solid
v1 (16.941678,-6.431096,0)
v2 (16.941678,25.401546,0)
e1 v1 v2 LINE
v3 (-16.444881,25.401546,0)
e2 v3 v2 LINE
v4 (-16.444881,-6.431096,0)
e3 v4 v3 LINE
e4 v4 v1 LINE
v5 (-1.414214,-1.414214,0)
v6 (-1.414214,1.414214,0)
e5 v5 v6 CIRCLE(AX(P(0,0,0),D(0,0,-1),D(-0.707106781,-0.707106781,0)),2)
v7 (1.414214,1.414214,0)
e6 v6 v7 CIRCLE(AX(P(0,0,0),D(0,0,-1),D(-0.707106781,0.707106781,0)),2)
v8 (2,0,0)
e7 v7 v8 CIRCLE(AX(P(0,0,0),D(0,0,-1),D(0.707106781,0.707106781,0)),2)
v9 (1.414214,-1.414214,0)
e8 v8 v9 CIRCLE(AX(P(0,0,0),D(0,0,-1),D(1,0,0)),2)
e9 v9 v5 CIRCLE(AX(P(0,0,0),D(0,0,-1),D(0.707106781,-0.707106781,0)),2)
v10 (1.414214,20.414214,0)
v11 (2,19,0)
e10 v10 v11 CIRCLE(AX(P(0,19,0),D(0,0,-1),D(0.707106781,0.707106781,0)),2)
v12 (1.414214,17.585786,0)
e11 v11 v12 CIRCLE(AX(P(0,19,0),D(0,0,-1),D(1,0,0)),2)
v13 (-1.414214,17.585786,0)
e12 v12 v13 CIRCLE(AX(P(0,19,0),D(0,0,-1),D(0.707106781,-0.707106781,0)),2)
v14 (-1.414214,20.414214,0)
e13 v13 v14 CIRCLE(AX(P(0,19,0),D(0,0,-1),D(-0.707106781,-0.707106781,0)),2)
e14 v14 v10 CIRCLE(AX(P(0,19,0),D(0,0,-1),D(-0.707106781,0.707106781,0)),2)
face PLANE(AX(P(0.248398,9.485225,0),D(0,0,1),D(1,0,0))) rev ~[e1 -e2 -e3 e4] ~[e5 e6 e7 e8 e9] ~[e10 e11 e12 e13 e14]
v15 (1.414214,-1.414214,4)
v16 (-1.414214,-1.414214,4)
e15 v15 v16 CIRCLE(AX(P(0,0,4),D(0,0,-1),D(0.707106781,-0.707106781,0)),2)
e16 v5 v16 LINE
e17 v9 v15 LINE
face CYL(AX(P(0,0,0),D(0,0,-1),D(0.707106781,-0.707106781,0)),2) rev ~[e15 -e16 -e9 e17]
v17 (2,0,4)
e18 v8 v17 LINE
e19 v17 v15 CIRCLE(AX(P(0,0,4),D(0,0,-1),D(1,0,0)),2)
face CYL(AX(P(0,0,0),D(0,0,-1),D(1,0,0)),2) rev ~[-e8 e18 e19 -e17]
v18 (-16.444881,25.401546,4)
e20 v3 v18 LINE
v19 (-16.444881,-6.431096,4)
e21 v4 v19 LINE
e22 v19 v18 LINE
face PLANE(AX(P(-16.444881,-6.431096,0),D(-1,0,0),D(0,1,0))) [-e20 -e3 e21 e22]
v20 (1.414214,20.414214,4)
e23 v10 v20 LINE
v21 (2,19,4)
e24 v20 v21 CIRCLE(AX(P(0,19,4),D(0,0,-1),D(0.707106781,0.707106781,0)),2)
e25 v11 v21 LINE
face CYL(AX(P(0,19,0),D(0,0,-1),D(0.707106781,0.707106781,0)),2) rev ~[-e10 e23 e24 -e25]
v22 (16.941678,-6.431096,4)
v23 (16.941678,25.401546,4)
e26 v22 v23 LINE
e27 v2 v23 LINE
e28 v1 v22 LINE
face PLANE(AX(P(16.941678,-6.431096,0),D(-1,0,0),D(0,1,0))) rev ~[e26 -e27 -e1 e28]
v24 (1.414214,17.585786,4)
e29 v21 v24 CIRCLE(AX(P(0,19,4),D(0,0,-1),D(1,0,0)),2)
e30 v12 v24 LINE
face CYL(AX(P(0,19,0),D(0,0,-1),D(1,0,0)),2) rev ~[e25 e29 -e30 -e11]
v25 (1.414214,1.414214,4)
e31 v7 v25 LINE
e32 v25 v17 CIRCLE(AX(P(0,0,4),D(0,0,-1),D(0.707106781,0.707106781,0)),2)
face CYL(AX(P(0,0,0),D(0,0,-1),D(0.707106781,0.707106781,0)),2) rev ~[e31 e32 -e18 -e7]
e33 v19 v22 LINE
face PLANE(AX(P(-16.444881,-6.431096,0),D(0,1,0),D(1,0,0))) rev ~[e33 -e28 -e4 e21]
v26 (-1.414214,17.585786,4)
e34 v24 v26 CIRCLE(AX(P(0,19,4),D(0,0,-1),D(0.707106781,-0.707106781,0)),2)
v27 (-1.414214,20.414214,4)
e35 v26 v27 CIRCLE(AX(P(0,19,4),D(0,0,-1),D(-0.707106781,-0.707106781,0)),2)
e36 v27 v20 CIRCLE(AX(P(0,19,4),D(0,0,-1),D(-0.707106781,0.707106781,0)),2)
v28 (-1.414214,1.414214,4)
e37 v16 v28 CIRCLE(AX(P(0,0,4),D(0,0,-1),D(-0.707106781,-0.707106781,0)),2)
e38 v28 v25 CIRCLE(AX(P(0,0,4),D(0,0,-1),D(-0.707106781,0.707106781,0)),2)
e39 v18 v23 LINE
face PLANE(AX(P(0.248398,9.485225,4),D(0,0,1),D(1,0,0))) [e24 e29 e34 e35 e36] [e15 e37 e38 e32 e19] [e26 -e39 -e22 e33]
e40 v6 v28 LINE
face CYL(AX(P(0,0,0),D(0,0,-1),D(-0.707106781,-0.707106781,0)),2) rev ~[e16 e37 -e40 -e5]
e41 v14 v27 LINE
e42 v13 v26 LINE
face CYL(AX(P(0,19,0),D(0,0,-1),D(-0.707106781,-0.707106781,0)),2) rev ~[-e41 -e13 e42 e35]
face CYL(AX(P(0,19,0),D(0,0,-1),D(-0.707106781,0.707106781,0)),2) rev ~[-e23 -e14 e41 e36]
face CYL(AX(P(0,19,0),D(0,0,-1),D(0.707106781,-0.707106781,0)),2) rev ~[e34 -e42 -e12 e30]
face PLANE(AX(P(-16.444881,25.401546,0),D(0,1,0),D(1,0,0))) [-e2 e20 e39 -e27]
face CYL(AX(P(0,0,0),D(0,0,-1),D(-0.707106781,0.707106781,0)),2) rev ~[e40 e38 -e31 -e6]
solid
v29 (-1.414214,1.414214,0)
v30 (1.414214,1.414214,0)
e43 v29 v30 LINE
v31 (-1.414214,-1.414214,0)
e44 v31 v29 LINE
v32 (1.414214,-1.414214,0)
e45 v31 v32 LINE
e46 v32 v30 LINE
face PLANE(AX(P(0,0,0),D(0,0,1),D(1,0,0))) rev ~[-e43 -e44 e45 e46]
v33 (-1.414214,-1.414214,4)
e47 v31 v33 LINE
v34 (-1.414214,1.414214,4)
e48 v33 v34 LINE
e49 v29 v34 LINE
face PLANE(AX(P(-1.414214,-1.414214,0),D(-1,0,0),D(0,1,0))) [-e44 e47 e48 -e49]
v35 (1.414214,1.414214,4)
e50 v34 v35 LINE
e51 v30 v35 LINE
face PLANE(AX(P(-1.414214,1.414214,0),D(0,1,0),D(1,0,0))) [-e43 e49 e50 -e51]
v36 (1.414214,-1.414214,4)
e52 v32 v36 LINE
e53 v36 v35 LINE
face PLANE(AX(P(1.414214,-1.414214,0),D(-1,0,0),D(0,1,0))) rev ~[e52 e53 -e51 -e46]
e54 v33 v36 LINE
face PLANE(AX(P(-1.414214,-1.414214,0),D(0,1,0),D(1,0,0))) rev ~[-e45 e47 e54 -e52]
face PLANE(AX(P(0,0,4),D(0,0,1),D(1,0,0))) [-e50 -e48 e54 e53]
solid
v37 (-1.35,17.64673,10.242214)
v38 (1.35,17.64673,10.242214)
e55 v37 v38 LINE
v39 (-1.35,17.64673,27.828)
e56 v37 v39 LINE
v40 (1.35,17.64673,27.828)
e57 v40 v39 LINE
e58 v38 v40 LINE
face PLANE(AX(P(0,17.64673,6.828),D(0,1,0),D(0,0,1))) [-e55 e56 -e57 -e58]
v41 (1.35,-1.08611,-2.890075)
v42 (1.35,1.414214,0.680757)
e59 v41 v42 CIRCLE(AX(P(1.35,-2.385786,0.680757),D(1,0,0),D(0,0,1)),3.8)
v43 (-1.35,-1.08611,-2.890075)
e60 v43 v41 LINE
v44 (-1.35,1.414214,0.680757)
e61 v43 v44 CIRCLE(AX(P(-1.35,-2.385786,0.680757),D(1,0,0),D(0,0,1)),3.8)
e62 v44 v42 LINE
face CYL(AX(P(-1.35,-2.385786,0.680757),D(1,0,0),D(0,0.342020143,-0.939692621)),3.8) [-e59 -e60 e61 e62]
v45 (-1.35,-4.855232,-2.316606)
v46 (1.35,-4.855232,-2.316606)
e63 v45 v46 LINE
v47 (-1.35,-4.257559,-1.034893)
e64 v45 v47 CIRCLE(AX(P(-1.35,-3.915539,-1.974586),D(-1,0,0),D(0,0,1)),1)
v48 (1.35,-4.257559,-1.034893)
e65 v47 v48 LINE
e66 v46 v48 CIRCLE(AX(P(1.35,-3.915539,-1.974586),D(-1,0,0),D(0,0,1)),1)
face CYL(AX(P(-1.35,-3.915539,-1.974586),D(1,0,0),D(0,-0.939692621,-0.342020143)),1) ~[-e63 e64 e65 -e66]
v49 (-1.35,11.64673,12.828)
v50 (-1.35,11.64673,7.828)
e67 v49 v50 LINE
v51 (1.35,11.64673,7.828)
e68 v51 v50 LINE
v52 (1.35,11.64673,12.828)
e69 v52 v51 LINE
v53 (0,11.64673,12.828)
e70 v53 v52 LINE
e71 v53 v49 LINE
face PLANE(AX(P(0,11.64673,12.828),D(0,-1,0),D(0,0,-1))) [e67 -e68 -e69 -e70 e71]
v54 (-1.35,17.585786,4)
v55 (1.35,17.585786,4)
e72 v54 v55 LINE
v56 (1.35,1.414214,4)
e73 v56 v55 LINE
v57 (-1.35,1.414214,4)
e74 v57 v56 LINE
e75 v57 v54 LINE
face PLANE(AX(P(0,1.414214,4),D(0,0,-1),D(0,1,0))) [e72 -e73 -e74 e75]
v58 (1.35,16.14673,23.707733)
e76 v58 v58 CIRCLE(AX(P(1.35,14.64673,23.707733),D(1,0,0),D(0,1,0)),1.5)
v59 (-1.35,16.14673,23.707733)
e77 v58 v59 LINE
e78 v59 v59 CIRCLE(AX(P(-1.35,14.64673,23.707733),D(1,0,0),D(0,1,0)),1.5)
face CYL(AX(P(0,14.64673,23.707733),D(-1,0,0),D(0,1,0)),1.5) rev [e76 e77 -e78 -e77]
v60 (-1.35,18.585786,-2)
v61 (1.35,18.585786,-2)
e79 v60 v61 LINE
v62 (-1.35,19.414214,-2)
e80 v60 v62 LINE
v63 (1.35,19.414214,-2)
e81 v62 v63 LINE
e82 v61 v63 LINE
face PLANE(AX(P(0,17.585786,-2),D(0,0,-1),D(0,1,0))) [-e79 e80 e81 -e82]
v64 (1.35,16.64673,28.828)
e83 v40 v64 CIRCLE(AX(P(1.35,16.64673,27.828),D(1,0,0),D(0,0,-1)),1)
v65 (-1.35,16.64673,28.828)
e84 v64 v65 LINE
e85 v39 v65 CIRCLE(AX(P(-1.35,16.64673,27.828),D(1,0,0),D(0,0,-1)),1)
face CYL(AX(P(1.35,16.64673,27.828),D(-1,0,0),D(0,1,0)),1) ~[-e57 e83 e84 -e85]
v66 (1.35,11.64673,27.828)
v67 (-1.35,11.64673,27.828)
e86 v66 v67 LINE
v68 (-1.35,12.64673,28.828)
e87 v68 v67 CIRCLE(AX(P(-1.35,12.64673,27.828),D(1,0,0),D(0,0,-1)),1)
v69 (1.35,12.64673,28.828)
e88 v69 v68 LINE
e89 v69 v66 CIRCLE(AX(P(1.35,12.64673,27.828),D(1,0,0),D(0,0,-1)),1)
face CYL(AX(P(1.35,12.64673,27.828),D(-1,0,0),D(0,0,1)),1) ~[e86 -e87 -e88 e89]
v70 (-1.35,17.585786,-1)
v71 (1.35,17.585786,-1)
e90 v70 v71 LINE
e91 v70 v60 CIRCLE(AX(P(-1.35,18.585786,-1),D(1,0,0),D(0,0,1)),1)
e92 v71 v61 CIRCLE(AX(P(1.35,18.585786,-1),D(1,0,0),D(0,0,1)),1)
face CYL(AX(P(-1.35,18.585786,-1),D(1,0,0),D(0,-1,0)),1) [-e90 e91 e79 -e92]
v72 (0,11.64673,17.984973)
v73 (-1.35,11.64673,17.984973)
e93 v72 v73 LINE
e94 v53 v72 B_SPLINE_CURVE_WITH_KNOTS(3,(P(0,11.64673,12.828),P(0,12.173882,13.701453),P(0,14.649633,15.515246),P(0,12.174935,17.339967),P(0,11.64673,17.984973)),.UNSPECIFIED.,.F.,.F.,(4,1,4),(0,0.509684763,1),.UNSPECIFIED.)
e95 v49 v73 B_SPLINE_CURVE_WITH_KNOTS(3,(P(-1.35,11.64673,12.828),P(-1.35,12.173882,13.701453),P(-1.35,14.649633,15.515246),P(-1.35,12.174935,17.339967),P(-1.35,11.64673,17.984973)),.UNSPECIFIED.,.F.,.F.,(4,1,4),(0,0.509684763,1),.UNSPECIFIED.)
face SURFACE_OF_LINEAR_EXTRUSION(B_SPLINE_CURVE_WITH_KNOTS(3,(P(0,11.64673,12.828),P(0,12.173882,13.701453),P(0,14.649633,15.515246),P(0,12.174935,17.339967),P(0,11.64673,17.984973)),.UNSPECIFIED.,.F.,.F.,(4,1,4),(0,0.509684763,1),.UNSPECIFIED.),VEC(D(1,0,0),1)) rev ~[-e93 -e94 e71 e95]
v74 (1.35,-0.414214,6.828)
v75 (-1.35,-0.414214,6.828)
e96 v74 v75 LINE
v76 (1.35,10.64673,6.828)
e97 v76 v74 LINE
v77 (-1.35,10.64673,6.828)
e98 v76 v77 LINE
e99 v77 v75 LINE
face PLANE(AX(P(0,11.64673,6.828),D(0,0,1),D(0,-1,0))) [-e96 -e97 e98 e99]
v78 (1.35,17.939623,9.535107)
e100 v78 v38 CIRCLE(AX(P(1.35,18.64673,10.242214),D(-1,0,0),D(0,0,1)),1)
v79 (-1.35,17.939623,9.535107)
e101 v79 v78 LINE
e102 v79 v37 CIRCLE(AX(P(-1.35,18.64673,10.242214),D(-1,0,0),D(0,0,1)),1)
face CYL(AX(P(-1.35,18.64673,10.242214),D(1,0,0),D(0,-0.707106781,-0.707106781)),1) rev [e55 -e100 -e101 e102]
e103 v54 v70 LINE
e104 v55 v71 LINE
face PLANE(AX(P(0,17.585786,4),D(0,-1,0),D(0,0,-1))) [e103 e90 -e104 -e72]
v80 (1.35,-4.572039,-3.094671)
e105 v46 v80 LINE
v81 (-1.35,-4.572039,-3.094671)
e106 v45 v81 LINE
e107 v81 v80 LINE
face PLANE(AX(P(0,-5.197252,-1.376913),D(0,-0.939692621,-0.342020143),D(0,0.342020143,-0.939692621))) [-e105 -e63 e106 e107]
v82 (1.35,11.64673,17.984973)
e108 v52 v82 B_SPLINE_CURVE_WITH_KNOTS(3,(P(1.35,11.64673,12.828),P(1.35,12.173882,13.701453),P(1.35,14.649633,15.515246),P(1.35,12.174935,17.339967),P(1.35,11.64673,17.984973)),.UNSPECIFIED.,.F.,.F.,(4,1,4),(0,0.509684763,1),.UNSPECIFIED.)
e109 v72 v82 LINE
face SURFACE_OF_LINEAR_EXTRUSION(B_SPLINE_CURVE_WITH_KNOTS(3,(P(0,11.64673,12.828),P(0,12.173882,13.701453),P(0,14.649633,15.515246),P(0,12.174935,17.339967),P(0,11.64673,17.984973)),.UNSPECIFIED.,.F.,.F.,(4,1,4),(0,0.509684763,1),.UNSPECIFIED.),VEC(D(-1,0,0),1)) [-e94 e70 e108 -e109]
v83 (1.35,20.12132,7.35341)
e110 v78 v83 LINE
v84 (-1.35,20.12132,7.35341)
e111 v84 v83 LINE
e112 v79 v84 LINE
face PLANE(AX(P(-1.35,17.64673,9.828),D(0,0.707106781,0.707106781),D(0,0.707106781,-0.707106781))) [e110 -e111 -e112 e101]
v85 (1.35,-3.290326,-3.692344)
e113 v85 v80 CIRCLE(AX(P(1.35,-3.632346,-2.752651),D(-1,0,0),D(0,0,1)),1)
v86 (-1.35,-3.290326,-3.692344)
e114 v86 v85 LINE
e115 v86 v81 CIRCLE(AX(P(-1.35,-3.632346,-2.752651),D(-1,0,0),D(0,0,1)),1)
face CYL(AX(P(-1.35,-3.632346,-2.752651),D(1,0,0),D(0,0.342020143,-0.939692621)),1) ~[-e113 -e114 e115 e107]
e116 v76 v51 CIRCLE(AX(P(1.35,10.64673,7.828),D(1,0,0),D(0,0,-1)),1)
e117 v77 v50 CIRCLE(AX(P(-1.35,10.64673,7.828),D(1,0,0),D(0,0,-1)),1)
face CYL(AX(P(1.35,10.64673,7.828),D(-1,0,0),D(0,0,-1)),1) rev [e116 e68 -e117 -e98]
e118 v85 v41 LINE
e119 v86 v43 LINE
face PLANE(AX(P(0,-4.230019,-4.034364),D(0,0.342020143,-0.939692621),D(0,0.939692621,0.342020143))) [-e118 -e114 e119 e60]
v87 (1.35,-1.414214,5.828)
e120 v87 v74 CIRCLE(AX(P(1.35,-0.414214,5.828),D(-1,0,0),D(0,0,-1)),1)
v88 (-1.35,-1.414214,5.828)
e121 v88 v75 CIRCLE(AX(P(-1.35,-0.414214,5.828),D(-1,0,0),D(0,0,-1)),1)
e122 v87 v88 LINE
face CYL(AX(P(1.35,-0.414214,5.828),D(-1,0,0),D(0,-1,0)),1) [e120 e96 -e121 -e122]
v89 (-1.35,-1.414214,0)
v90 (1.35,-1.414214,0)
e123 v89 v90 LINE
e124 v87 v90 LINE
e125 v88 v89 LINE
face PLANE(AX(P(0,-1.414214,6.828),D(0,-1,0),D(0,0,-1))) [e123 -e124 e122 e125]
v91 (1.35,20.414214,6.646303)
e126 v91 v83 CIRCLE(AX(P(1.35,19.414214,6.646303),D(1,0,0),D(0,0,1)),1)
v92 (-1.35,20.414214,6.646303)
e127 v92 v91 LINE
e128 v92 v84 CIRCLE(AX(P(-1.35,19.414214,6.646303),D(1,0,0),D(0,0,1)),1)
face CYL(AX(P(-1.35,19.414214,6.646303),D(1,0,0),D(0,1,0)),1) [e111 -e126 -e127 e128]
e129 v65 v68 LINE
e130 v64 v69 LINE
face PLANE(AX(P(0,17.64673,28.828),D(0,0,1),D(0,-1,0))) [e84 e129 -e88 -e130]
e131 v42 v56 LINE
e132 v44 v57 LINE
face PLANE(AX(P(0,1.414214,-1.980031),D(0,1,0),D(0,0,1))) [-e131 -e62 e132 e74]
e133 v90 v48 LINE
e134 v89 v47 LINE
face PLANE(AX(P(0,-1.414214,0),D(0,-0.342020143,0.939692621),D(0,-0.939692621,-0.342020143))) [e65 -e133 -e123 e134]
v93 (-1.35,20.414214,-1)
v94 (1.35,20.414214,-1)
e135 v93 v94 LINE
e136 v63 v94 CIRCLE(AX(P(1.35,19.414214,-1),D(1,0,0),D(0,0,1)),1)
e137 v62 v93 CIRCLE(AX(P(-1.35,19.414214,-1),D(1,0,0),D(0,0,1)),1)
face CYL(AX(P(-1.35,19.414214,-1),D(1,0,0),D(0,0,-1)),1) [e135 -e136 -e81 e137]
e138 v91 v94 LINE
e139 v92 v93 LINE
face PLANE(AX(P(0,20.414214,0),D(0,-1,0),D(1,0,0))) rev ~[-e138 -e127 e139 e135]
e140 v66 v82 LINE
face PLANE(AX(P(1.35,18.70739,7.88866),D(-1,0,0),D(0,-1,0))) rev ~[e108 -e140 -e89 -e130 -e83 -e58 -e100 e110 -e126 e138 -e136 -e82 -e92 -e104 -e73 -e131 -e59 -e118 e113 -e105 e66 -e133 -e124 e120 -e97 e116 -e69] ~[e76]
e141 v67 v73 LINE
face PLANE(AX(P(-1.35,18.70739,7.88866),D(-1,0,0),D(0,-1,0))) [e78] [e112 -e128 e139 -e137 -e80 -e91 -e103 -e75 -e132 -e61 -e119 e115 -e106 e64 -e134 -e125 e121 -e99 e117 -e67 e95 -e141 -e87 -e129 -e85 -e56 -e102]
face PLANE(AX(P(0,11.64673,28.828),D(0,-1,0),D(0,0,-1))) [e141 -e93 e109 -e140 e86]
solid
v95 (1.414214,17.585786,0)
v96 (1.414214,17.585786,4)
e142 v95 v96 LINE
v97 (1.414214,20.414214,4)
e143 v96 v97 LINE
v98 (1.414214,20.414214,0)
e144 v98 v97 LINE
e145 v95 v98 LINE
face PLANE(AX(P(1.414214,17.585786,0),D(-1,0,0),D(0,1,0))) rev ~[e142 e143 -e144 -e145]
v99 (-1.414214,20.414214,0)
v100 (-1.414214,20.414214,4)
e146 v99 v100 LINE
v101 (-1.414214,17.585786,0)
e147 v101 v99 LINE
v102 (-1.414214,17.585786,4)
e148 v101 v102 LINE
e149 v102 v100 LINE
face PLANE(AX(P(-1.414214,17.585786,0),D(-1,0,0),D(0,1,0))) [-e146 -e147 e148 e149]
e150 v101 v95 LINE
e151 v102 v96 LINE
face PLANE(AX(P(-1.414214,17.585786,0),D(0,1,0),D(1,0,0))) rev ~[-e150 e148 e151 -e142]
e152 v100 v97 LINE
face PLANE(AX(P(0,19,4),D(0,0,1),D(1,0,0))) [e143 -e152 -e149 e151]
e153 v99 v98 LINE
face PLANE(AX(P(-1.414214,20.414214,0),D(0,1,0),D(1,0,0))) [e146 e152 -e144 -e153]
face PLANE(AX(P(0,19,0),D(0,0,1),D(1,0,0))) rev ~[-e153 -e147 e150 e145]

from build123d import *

# Parameters (mm, degrees)
F1_W        = 33.3865592256
F1_H        = 31.8326419219
F2_DEPTH    = 4
F1_W_2      = 2.8284271247
F1_H_2      = 2.8284271247
F3_DEPTH    = 4
F4_R        = 1.5
F5_DEPTH    = 1.35
F6_T4_DEPTH = 2.7
F7_R        = 3.8
F8_R        = 1


# Not quite as in the source:
# - a fillet or chamfer that OpenCascade refuses, or shapes differently, is made with other operations: its cross-section is extruded or revolved along the edge and cut away or added


with BuildPart() as f2:
    # F1 (on Top) → F2 (new body)
    with BuildSketch(Plane.XY):
        with Locations((0.2483981661, 9.4852247275)):
            Rectangle(F1_W, F1_H)
        with BuildLine():
            ThreePointArc((1.4142135624, 1.4142135624), (1.847759065, 0.7653668647), (2, 0))
            ThreePointArc((2, 0), (1.847759065, -0.7653668647), (1.4142135624, -1.4142135624))
            ThreePointArc((1.4142135624, -1.4142135624), (0, -2), (-1.4142135624, -1.4142135624))
            ThreePointArc((-1.4142135624, -1.4142135624), (-2, 0), (-1.4142135624, 1.4142135624))
            ThreePointArc((-1.4142135624, 1.4142135624), (0, 2), (1.4142135624, 1.4142135624))
        make_face(mode=Mode.SUBTRACT)
        with BuildLine():
            ThreePointArc((1.4142135624, 20.4142135624), (1.847759065, 19.7653668647), (2, 19))
            ThreePointArc((2, 19), (1.847759065, 18.2346331353), (1.4142135624, 17.5857864376))
            ThreePointArc((1.4142135624, 17.5857864376), (0, 17), (-1.4142135624, 17.5857864376))
            ThreePointArc((-1.4142135624, 17.5857864376), (-2, 19), (-1.4142135624, 20.4142135624))
            ThreePointArc((-1.4142135624, 20.4142135624), (0, 21), (1.4142135624, 20.4142135624))
        make_face(mode=Mode.SUBTRACT)
    extrude(amount=F2_DEPTH)


with BuildPart() as f3:
    # F1 (on Top) → F3 (new body)
    with BuildSketch(Plane.XY):
        Rectangle(F1_W_2, F1_H_2)
    extrude(amount=F3_DEPTH)


with BuildPart() as f3b:
    # F1 (on Top) → F3, piece 2 (new body)
    with BuildSketch(Plane.XY):
        with Locations((0, 19)):
            Rectangle(F1_W_2, F1_H_2)
    extrude(amount=F3_DEPTH)


with BuildPart() as f5:
    # F4 (on Right) → F5 (new body, symmetric)
    with BuildSketch(Plane.YZ):
        with BuildLine():
            Line((-1.4142135624, 6.828), (-1.4142135624, 4))
            Line((-1.4142135624, 4), (-1.4142135624, 0))
            Line((-1.4142135624, 0), (-5.1972519021, -1.3769133508))
            Line((-5.1972519021, -1.3769133508), (-4.2300189368, -4.0343640823))
            Line((-4.2300189368, -4.0343640823), (1.4142135624, -1.9800314574))
            Line((1.4142135624, -1.9800314574), (1.4142135624, 0))
            Line((1.4142135624, 0), (1.4142135624, 4))
            Line((1.4142135624, 4), (17.5857864376, 4))
            Line((17.5857864376, 4), (17.5857864376, 0))
            Line((17.5857864376, 0), (17.5857864376, -2))
            Line((17.5857864376, -2), (20.4142135624, -2))
            Line((20.4142135624, -2), (20.4142135624, 0))
            Line((20.4142135624, 0), (20.4142135624, 4))
            Line((20.4142135624, 4), (20.4142135624, 6.828))
            Line((20.4142135624, 6.828), (17.646729894, 6.828))
            Line((17.646729894, 6.828), (17.646729894, 28.828))
            Line((17.646729894, 28.828), (11.646729894, 28.828))
            Line((11.646729894, 28.828), (11.646729894, 17.9849732667))
            add(Edge.make_bspline(
                [(11.646729894, 12.828), (12.1738818895, 13.7014529164), (14.6496330846, 15.5152462823), (12.174934911, 17.339967343), (11.646729894, 17.9849732667)],
                knots=[0, 0, 0, 0, 0.5096847631, 1, 1, 1, 1], degree=3))
            Line((11.646729894, 12.828), (11.646729894, 6.828))
            Line((11.646729894, 6.828), (-1.4142135624, 6.828))
        make_face()
        with Locations((14.646729894, 23.7077325583)):
            Circle(F4_R, mode=Mode.SUBTRACT)
    extrude(amount=F5_DEPTH, both=True)

    # F6: chamfer of 3 on 1 edges, made by hand


with BuildPart() as f6_tool2:
    # F6_s3 → F6_t4 (new body)
    with BuildSketch(Plane.YZ.offset(-1.35)):
        Polygon((17.646729894, 9.828), (20.646729894, 6.828), (17.646729894, 6.828), align=None)
    extrude(amount=F6_T4_DEPTH)

    split(bisect_by=Plane.XZ.offset(-20.4142135624), keep=Keep.TOP)


with BuildPart() as f5_1:
    add(f5.part)

    # F6_t1: union F6_tool2
    add(f6_tool2.part)

    # F7
    f7_edges = [f5_1.edges().sort_by_distance(p)[0] for p in [
        (0, 1.414214, -1.980031),
    ]]
    fillet(f7_edges, radius=F7_R)

    # F8
    f8_edges = [f5_1.edges().sort_by_distance(p)[0] for p in [
        (0, -5.197252, -1.376913),
        (0, -4.230019, -4.034364),
        (0, -1.414214, 6.828),
        (0, 11.64673, 6.828),
        (0, 11.64673, 28.828),
        (0, 17.64673, 28.828),
        (0, 17.585786, -2),
        (0, 20.414214, -2),
        (0, 20.414214, 7.060516),
        (0, 17.64673, 9.828),
    ]]
    fillet(f8_edges, radius=F8_R)


solid = Compound([f2.part, f3.part, f3b.part, f5_1.part])
